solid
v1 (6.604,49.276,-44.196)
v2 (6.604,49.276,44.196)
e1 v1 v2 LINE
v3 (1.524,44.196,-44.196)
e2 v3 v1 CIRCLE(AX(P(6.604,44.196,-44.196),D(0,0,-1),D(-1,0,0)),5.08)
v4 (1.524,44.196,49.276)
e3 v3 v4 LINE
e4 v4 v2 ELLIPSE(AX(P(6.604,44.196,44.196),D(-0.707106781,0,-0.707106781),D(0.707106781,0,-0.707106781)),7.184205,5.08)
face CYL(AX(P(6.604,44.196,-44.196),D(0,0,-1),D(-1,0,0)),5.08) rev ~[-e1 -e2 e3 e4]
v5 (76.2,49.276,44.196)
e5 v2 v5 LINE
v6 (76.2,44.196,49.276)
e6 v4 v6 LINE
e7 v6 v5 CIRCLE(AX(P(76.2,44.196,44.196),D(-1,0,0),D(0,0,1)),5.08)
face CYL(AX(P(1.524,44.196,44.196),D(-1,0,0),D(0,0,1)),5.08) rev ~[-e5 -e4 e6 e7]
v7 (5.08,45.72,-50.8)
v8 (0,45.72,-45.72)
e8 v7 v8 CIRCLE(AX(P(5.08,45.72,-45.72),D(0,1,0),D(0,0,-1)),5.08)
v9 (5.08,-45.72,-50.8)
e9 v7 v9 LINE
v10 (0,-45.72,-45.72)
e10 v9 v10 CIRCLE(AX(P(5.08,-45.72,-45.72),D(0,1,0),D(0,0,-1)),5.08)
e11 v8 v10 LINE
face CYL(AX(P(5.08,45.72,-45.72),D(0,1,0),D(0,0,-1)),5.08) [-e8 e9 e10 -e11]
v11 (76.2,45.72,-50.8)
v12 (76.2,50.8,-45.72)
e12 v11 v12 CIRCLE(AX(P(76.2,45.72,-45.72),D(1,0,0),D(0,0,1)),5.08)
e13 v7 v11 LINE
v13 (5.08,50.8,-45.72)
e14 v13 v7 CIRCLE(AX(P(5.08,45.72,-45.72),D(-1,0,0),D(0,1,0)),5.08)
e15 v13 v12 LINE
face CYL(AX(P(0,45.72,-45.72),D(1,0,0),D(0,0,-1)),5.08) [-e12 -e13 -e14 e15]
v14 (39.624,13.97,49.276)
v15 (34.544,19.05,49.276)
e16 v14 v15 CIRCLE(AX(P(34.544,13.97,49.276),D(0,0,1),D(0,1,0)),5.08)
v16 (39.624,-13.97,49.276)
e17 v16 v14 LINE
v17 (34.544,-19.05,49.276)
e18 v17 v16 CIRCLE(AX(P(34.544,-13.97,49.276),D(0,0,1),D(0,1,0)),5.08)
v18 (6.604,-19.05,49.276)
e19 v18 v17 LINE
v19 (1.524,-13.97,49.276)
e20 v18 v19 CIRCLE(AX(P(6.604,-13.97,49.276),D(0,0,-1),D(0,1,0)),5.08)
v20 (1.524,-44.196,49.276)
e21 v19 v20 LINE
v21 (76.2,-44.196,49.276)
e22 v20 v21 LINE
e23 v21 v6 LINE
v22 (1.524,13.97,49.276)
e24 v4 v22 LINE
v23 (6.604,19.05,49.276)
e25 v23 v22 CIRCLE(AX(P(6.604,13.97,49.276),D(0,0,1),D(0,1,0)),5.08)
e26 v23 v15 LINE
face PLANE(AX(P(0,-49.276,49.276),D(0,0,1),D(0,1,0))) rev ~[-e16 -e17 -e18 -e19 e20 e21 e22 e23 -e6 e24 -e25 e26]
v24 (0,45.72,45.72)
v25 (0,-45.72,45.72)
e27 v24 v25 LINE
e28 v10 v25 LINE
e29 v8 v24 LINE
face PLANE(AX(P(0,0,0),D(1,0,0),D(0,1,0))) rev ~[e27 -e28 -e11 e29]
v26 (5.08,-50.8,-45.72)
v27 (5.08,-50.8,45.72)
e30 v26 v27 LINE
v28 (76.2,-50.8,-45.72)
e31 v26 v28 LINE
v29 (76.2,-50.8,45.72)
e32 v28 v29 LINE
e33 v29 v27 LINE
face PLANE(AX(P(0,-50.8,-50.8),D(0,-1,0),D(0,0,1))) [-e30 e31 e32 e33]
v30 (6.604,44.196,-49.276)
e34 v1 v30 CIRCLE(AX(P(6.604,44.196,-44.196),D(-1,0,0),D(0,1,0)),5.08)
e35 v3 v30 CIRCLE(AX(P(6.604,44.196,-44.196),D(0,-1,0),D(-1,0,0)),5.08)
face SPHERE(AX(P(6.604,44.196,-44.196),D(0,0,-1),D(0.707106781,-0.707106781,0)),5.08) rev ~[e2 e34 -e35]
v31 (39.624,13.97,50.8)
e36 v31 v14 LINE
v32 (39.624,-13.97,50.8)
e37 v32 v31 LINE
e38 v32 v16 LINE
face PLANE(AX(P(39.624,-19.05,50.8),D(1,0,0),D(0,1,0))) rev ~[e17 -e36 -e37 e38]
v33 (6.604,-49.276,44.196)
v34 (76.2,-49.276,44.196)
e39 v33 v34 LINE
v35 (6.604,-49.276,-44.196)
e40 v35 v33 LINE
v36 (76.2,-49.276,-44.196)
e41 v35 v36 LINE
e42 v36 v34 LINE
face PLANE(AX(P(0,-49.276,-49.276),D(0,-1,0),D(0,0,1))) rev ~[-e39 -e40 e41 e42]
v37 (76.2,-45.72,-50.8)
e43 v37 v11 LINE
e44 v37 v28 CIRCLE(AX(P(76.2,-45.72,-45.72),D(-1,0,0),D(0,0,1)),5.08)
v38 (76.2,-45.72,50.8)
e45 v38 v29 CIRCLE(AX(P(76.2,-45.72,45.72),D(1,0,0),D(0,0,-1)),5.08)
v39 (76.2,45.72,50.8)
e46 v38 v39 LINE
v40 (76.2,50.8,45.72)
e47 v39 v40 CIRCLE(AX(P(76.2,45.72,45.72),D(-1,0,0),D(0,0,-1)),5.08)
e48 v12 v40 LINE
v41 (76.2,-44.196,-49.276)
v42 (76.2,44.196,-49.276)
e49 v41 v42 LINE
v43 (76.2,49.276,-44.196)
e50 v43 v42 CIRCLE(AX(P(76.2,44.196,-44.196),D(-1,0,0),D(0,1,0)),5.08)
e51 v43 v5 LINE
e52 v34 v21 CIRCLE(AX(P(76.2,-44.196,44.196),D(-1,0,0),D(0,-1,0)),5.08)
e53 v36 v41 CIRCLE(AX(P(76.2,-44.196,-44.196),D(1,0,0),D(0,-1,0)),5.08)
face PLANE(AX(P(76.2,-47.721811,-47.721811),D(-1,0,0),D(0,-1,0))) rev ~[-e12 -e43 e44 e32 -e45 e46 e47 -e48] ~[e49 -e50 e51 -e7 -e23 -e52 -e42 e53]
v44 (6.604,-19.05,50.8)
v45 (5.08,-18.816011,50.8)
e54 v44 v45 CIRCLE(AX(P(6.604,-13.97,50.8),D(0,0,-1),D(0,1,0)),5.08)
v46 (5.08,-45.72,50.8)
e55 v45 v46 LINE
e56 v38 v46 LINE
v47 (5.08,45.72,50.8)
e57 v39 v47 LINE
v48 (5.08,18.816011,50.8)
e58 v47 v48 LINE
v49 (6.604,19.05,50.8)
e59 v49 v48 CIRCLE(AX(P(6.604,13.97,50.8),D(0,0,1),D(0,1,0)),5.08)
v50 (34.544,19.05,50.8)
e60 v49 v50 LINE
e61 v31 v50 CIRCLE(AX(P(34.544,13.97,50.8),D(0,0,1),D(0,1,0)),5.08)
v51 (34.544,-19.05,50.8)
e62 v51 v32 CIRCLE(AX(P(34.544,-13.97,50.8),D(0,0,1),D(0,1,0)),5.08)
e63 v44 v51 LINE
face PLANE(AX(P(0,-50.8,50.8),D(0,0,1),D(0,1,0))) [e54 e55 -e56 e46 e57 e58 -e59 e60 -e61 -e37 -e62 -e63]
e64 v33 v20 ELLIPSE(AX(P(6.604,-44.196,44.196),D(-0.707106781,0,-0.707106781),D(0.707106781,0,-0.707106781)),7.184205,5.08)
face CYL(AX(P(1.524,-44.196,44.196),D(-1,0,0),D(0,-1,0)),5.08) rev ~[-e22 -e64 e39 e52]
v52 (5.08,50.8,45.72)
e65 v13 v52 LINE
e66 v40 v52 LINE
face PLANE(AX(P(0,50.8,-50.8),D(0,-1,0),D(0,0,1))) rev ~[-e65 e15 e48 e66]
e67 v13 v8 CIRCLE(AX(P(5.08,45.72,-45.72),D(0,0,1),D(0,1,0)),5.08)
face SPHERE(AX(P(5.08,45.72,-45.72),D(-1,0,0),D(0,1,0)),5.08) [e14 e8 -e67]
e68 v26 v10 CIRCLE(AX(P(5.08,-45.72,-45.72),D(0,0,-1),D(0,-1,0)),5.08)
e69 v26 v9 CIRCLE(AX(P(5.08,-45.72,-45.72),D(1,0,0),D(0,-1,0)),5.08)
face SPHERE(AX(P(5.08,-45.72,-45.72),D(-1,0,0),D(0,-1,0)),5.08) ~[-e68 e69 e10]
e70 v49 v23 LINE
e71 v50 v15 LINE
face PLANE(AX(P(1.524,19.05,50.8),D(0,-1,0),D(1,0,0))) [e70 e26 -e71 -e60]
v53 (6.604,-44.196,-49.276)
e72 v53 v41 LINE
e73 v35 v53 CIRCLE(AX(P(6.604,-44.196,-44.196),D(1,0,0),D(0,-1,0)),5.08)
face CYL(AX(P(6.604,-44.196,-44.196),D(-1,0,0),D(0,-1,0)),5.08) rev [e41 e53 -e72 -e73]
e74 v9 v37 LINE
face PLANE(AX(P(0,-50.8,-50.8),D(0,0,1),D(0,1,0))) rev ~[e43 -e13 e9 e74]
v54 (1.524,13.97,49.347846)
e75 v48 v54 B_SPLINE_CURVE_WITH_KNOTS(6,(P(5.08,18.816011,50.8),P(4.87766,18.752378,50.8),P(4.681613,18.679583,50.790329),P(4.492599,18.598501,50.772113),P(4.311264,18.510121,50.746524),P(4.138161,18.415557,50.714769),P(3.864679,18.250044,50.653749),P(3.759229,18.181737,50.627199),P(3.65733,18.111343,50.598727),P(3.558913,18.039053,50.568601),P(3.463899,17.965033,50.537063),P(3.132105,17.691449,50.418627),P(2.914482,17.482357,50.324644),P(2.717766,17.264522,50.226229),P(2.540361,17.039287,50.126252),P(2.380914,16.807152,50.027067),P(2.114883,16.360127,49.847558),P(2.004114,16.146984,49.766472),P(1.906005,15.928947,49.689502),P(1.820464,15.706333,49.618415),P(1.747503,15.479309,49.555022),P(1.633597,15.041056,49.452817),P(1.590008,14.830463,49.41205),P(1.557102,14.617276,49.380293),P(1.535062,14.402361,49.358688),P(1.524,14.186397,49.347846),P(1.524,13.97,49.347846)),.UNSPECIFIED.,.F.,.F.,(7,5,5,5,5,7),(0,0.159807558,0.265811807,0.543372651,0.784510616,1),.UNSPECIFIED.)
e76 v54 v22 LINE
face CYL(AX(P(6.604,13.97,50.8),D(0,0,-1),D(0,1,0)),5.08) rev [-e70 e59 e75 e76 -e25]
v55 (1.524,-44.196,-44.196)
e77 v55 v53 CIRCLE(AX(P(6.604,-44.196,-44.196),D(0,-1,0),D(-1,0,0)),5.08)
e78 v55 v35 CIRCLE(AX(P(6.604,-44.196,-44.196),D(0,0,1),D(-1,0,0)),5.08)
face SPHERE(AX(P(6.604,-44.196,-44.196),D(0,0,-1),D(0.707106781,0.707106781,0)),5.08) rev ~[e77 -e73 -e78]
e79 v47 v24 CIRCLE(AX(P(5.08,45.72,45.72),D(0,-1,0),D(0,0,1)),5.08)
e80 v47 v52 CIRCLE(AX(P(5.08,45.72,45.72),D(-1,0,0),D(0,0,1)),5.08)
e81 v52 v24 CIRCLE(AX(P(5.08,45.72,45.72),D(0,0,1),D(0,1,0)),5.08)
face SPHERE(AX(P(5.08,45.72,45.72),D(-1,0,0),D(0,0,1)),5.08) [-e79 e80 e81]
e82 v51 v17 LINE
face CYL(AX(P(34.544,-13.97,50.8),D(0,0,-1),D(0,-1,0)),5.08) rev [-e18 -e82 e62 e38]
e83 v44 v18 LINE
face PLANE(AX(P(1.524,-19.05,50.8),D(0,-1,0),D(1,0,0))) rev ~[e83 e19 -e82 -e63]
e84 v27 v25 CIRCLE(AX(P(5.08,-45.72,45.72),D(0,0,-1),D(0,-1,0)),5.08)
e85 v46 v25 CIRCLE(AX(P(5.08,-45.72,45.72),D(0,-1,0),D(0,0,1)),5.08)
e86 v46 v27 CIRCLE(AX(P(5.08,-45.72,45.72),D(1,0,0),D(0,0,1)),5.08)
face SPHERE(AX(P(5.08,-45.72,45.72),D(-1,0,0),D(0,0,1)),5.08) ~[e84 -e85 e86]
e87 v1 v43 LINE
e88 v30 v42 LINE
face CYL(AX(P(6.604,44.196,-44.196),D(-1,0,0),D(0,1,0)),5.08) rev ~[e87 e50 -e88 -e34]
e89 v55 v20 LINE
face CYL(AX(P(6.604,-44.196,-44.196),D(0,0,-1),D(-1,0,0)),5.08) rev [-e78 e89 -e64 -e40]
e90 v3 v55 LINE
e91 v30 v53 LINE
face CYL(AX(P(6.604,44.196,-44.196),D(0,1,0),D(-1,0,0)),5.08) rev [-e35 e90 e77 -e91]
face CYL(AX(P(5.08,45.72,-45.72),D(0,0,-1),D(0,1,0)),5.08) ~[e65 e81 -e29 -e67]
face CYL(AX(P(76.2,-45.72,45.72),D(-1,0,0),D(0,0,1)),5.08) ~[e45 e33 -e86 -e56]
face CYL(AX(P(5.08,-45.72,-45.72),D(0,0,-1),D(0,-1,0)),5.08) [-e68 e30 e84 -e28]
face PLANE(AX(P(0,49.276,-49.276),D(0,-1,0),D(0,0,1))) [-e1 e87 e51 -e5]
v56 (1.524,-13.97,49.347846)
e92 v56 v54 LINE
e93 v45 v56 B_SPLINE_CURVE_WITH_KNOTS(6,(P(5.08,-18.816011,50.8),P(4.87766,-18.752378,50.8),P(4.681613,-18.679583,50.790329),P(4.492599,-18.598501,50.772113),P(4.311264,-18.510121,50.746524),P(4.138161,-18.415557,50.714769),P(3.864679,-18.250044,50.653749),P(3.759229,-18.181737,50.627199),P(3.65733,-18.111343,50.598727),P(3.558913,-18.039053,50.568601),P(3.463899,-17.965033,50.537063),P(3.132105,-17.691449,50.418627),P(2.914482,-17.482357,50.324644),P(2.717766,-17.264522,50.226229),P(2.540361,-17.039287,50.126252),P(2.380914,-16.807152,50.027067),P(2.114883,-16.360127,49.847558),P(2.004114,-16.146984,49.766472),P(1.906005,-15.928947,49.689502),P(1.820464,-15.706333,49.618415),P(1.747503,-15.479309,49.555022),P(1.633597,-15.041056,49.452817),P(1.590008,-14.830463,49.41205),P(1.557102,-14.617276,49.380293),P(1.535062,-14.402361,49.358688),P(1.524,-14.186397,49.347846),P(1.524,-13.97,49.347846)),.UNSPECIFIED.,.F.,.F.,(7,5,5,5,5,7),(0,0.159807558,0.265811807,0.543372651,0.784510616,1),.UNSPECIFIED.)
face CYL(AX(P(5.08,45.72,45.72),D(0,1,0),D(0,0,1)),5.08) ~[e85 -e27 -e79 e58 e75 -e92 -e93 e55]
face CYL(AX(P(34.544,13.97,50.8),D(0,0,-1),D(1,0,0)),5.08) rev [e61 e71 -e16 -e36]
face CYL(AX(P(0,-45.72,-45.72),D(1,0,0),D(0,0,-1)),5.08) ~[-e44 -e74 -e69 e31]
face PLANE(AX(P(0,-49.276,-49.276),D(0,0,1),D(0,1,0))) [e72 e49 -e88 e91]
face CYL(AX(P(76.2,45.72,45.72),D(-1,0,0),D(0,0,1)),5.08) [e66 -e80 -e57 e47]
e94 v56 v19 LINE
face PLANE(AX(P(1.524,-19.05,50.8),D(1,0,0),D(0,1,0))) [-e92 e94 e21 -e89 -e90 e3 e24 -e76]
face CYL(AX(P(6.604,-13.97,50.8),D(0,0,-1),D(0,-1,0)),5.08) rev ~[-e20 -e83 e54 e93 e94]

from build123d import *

# Parameters (mm, degrees)
F0_W          = 101.6
F0_H          = 101.6
F0_W_2        = 98.552
F0_H_2        = 98.552
F1_DEPTH      = 76.2
F2_W          = 101.6
F2_H          = 101.6
F3_DEPTH      = 1.524
F4_W          = 38.1
F4_H          = 38.1
F5_DEPTH      = 1.524
F6_R          = 5.08
F7_R          = 5.08
F10_T1_DEPTH  = 93.472
F10_T3_DEPTH  = 88.392
F10_T5_DEPTH  = 74.676
F10_T7_DEPTH  = 69.596
F10_S11_W     = 5.08
F10_S11_H     = 5.08
F10_T12_DEPTH = 5.08
F10_S17_W     = 5.08
F10_S17_H     = 5.08
F10_T18_DEPTH = 5.08
F10_T21_DEPTH = 91.44
F10_T23_DEPTH = 91.44
F10_T26_ANGLE = 90
F10_T28_ANGLE = 90
F10_T30_ANGLE = 90
F10_T32_ANGLE = 90


# Not quite as in the source:
# - a fillet or chamfer that OpenCascade refuses, or shapes differently, is made with other operations: its cross-section is extruded or revolved along the edge and cut away or added
# - a feature of the source that left no trace in its solid (it failed there, or was rolled back) is left out


with BuildPart() as f1:
    # F0 (on Right) → F1 (new body)
    with BuildSketch(Plane.YZ):
        Rectangle(F0_W, F0_H)
        Rectangle(F0_W_2, F0_H_2, mode=Mode.SUBTRACT)
    extrude(amount=F1_DEPTH)

    # F2 (on Right) → F3 (join)
    with BuildSketch(Plane.YZ):
        Rectangle(F2_W, F2_H)
    extrude(amount=F3_DEPTH)

    # F4 (on face) → F5 (cut)
    with BuildSketch(Plane.XY.offset(50.8)):
        with Locations((20.574, 0)):
            Rectangle(F4_W, F4_H)
    extrude(amount=-F5_DEPTH, mode=Mode.SUBTRACT)

    # F6
    f6_edges = [f1.edges().sort_by_distance(p)[0] for p in [
        (39.624, 19.05, 50.038),
        (39.624, -19.05, 50.038),
        (1.524, -19.05, 50.038),
        (1.524, 19.05, 50.038),
    ]]
    fillet(f6_edges, radius=F6_R)

    # F7
    f7_edges = [f1.edges().sort_by_distance(p)[0] for p in [
        (38.1, 50.8, 50.8),
        (38.1, -50.8, 50.8),
        (38.1, -50.8, -50.8),
        (38.1, 50.8, -50.8),
    ]]
    fillet(f7_edges, radius=F7_R)

    # F10: fillet of radius 5.08 on 15 edges, made by hand

    # F10_s2 → F10_t1 (join)
    with BuildSketch(Plane.XY.offset(-44.196)):
        with BuildLine():
            ThreePointArc((1.524, 44.196), (3.0118975516, 47.7881024484), (6.604, 49.276))
            Line((6.604, 49.276), (1.524, 49.276))
            Line((1.524, 49.276), (1.524, 44.196))
        make_face()
        with BuildLine():
            ThreePointArc((1.524, -44.196), (3.0118975516, -47.7881024484), (6.604, -49.276))
            Line((6.604, -49.276), (1.524, -49.276))
            Line((1.524, -49.276), (1.524, -44.196))
        make_face()
    extrude(amount=F10_T1_DEPTH)

    # F10_s4 → F10_t3 (join)
    with BuildSketch(Plane.XZ.offset(-44.196)):
        with BuildLine():
            ThreePointArc((1.524, -44.196), (3.0118975516, -47.7881024484), (6.604, -49.276))
            Line((6.604, -49.276), (1.524, -49.276))
            Line((1.524, -49.276), (1.524, -44.196))
        make_face()
    extrude(amount=F10_T3_DEPTH)

    # F10_s6 → F10_t5 (join)
    with BuildSketch(Plane.YZ.offset(1.524)):
        with BuildLine():
            ThreePointArc((-49.276, 44.196), (-47.7881024484, 47.7881024484), (-44.196, 49.276))
            Line((-44.196, 49.276), (-49.276, 49.276))
            Line((-49.276, 49.276), (-49.276, 44.196))
        make_face()
        with BuildLine():
            ThreePointArc((44.196, 49.276), (47.7881024484, 47.7881024484), (49.276, 44.196))
            Line((49.276, 44.196), (49.276, 49.276))
            Line((49.276, 49.276), (44.196, 49.276))
        make_face()
    extrude(amount=F10_T5_DEPTH)

    # F10_s8 → F10_t7 (join)
    with BuildSketch(Plane.YZ.offset(6.604)):
        with BuildLine():
            ThreePointArc((-49.276, -44.196), (-47.7881024484, -47.7881024484), (-44.196, -49.276))
            Line((-44.196, -49.276), (-49.276, -49.276))
            Line((-49.276, -49.276), (-49.276, -44.196))
        make_face()
        with BuildLine():
            ThreePointArc((49.276, -44.196), (47.7881024484, -47.7881024484), (44.196, -49.276))
            Line((44.196, -49.276), (49.276, -49.276))
            Line((49.276, -49.276), (49.276, -44.196))
        make_face()
    extrude(amount=F10_T7_DEPTH)


with BuildPart() as f10_tool10:
    # F10_s11 → F10_t12 (new body)
    with BuildSketch(Plane.XY.offset(-44.196)):
        with Locations((4.064, 46.736)):
            Rectangle(F10_S11_W, F10_S11_H)
    extrude(amount=-F10_T12_DEPTH)

    # F10_s13 → F10_t14 (revolve, cut)
    with BuildSketch(Plane(origin=(6.604, 44.196, -44.196), x_dir=(0.7071067812, -0.7071067812, 0), z_dir=(0.7071067812, 0.7071067812, 0))):
        with BuildLine():
            ThreePointArc((0, -5.08), (5.08, 0), (0, 5.08))
            Line((0, 5.08), (0, -5.08))
        make_face()
    revolve(axis=Axis((6.604, 44.196, -44.196), (0, 0, -1)), mode=Mode.SUBTRACT)


with BuildPart() as f1_1:
    add(f1.part)

    # F10_t9: union F10_tool10
    add(f10_tool10.part)


with BuildPart() as f10_tool16:
    # F10_s17 → F10_t18 (new body)
    with BuildSketch(Plane.XY.offset(-44.196)):
        with Locations((4.064, -46.736)):
            Rectangle(F10_S17_W, F10_S17_H)
    extrude(amount=-F10_T18_DEPTH)

    # F10_s19 → F10_t20 (revolve, cut)
    with BuildSketch(Plane(origin=(6.604, -44.196, -44.196), x_dir=(0.7071067812, 0.7071067812, 0), z_dir=(-0.7071067812, 0.7071067812, 0))):
        with BuildLine():
            ThreePointArc((0, -5.08), (5.08, 0), (0, 5.08))
            Line((0, 5.08), (0, -5.08))
        make_face()
    revolve(axis=Axis((6.604, -44.196, -44.196), (0, 0, -1)), mode=Mode.SUBTRACT)


with BuildPart() as f1_2:
    add(f1_1.part)

    # F10_t15: union F10_tool16
    add(f10_tool16.part)

    # F10_s22 → F10_t21 (cut)
    with BuildSketch(Plane.XZ.offset(-45.72)):
        with BuildLine():
            ThreePointArc((5.08, 50.8), (1.4878975516, 49.3121024484), (0, 45.72))
            Line((0, 45.72), (0, 50.8))
            Line((0, 50.8), (5.08, 50.8))
        make_face()
        with BuildLine():
            ThreePointArc((5.08, -50.8), (1.4878975516, -49.3121024484), (0, -45.72))
            Line((0, -45.72), (0, -50.8))
            Line((0, -50.8), (5.08, -50.8))
        make_face()
    extrude(amount=F10_T21_DEPTH, mode=Mode.SUBTRACT)

    # F10_s24 → F10_t23 (cut)
    with BuildSketch(Plane.XY.offset(-45.72)):
        with BuildLine():
            ThreePointArc((5.08, 50.8), (1.4878975516, 49.3121024484), (0, 45.72))
            Line((0, 45.72), (0, 50.8))
            Line((0, 50.8), (5.08, 50.8))
        make_face()
        with BuildLine():
            ThreePointArc((5.08, -50.8), (1.4878975516, -49.3121024484), (0, -45.72))
            Line((0, -45.72), (0, -50.8))
            Line((0, -50.8), (5.08, -50.8))
        make_face()
    extrude(amount=F10_T23_DEPTH, mode=Mode.SUBTRACT)

    # F10_s25 → F10_t26 (revolve, cut)
    with BuildSketch(Plane.XY.offset(-45.72)):
        with BuildLine():
            ThreePointArc((5.08, 50.8), (1.4878975516, 49.3121024484), (0, 45.72))
            Line((0, 45.72), (0, 50.8))
            Line((0, 50.8), (5.08, 50.8))
        make_face()
    revolve(axis=Axis((0, 45.72, -45.72), (-1, 0, 0)), revolution_arc=F10_T26_ANGLE, mode=Mode.SUBTRACT)

    # F10_s27 → F10_t28 (revolve, cut)
    with BuildSketch(Plane.XZ.offset(-45.72)):
        with BuildLine():
            ThreePointArc((5.08, 50.8), (1.4878975516, 49.3121024484), (0, 45.72))
            Line((0, 45.72), (0, 50.8))
            Line((0, 50.8), (5.08, 50.8))
        make_face()
    revolve(axis=Axis((0, 45.72, 45.72), (-1, 0, 0)), revolution_arc=F10_T28_ANGLE, mode=Mode.SUBTRACT)

    # F10_s29 → F10_t30 (revolve, cut)
    with BuildSketch(Plane.XY.offset(-45.72)):
        with BuildLine():
            ThreePointArc((5.08, -50.8), (1.4878975516, -49.3121024484), (0, -45.72))
            Line((0, -45.72), (0, -50.8))
            Line((0, -50.8), (5.08, -50.8))
        make_face()
    revolve(axis=Axis((0, -45.72, -45.72), (1, 0, 0)), revolution_arc=F10_T30_ANGLE, mode=Mode.SUBTRACT)

    # F10_s31 → F10_t32 (revolve, cut)
    with BuildSketch(Plane.XZ.offset(45.72)):
        with BuildLine():
            ThreePointArc((5.08, 50.8), (1.4878975516, 49.3121024484), (0, 45.72))
            Line((0, 45.72), (0, 50.8))
            Line((0, 50.8), (5.08, 50.8))
        make_face()
    revolve(axis=Axis((0, -45.72, 45.72), (1, 0, 0)), revolution_arc=F10_T32_ANGLE, mode=Mode.SUBTRACT)


solid = f1_2.part
